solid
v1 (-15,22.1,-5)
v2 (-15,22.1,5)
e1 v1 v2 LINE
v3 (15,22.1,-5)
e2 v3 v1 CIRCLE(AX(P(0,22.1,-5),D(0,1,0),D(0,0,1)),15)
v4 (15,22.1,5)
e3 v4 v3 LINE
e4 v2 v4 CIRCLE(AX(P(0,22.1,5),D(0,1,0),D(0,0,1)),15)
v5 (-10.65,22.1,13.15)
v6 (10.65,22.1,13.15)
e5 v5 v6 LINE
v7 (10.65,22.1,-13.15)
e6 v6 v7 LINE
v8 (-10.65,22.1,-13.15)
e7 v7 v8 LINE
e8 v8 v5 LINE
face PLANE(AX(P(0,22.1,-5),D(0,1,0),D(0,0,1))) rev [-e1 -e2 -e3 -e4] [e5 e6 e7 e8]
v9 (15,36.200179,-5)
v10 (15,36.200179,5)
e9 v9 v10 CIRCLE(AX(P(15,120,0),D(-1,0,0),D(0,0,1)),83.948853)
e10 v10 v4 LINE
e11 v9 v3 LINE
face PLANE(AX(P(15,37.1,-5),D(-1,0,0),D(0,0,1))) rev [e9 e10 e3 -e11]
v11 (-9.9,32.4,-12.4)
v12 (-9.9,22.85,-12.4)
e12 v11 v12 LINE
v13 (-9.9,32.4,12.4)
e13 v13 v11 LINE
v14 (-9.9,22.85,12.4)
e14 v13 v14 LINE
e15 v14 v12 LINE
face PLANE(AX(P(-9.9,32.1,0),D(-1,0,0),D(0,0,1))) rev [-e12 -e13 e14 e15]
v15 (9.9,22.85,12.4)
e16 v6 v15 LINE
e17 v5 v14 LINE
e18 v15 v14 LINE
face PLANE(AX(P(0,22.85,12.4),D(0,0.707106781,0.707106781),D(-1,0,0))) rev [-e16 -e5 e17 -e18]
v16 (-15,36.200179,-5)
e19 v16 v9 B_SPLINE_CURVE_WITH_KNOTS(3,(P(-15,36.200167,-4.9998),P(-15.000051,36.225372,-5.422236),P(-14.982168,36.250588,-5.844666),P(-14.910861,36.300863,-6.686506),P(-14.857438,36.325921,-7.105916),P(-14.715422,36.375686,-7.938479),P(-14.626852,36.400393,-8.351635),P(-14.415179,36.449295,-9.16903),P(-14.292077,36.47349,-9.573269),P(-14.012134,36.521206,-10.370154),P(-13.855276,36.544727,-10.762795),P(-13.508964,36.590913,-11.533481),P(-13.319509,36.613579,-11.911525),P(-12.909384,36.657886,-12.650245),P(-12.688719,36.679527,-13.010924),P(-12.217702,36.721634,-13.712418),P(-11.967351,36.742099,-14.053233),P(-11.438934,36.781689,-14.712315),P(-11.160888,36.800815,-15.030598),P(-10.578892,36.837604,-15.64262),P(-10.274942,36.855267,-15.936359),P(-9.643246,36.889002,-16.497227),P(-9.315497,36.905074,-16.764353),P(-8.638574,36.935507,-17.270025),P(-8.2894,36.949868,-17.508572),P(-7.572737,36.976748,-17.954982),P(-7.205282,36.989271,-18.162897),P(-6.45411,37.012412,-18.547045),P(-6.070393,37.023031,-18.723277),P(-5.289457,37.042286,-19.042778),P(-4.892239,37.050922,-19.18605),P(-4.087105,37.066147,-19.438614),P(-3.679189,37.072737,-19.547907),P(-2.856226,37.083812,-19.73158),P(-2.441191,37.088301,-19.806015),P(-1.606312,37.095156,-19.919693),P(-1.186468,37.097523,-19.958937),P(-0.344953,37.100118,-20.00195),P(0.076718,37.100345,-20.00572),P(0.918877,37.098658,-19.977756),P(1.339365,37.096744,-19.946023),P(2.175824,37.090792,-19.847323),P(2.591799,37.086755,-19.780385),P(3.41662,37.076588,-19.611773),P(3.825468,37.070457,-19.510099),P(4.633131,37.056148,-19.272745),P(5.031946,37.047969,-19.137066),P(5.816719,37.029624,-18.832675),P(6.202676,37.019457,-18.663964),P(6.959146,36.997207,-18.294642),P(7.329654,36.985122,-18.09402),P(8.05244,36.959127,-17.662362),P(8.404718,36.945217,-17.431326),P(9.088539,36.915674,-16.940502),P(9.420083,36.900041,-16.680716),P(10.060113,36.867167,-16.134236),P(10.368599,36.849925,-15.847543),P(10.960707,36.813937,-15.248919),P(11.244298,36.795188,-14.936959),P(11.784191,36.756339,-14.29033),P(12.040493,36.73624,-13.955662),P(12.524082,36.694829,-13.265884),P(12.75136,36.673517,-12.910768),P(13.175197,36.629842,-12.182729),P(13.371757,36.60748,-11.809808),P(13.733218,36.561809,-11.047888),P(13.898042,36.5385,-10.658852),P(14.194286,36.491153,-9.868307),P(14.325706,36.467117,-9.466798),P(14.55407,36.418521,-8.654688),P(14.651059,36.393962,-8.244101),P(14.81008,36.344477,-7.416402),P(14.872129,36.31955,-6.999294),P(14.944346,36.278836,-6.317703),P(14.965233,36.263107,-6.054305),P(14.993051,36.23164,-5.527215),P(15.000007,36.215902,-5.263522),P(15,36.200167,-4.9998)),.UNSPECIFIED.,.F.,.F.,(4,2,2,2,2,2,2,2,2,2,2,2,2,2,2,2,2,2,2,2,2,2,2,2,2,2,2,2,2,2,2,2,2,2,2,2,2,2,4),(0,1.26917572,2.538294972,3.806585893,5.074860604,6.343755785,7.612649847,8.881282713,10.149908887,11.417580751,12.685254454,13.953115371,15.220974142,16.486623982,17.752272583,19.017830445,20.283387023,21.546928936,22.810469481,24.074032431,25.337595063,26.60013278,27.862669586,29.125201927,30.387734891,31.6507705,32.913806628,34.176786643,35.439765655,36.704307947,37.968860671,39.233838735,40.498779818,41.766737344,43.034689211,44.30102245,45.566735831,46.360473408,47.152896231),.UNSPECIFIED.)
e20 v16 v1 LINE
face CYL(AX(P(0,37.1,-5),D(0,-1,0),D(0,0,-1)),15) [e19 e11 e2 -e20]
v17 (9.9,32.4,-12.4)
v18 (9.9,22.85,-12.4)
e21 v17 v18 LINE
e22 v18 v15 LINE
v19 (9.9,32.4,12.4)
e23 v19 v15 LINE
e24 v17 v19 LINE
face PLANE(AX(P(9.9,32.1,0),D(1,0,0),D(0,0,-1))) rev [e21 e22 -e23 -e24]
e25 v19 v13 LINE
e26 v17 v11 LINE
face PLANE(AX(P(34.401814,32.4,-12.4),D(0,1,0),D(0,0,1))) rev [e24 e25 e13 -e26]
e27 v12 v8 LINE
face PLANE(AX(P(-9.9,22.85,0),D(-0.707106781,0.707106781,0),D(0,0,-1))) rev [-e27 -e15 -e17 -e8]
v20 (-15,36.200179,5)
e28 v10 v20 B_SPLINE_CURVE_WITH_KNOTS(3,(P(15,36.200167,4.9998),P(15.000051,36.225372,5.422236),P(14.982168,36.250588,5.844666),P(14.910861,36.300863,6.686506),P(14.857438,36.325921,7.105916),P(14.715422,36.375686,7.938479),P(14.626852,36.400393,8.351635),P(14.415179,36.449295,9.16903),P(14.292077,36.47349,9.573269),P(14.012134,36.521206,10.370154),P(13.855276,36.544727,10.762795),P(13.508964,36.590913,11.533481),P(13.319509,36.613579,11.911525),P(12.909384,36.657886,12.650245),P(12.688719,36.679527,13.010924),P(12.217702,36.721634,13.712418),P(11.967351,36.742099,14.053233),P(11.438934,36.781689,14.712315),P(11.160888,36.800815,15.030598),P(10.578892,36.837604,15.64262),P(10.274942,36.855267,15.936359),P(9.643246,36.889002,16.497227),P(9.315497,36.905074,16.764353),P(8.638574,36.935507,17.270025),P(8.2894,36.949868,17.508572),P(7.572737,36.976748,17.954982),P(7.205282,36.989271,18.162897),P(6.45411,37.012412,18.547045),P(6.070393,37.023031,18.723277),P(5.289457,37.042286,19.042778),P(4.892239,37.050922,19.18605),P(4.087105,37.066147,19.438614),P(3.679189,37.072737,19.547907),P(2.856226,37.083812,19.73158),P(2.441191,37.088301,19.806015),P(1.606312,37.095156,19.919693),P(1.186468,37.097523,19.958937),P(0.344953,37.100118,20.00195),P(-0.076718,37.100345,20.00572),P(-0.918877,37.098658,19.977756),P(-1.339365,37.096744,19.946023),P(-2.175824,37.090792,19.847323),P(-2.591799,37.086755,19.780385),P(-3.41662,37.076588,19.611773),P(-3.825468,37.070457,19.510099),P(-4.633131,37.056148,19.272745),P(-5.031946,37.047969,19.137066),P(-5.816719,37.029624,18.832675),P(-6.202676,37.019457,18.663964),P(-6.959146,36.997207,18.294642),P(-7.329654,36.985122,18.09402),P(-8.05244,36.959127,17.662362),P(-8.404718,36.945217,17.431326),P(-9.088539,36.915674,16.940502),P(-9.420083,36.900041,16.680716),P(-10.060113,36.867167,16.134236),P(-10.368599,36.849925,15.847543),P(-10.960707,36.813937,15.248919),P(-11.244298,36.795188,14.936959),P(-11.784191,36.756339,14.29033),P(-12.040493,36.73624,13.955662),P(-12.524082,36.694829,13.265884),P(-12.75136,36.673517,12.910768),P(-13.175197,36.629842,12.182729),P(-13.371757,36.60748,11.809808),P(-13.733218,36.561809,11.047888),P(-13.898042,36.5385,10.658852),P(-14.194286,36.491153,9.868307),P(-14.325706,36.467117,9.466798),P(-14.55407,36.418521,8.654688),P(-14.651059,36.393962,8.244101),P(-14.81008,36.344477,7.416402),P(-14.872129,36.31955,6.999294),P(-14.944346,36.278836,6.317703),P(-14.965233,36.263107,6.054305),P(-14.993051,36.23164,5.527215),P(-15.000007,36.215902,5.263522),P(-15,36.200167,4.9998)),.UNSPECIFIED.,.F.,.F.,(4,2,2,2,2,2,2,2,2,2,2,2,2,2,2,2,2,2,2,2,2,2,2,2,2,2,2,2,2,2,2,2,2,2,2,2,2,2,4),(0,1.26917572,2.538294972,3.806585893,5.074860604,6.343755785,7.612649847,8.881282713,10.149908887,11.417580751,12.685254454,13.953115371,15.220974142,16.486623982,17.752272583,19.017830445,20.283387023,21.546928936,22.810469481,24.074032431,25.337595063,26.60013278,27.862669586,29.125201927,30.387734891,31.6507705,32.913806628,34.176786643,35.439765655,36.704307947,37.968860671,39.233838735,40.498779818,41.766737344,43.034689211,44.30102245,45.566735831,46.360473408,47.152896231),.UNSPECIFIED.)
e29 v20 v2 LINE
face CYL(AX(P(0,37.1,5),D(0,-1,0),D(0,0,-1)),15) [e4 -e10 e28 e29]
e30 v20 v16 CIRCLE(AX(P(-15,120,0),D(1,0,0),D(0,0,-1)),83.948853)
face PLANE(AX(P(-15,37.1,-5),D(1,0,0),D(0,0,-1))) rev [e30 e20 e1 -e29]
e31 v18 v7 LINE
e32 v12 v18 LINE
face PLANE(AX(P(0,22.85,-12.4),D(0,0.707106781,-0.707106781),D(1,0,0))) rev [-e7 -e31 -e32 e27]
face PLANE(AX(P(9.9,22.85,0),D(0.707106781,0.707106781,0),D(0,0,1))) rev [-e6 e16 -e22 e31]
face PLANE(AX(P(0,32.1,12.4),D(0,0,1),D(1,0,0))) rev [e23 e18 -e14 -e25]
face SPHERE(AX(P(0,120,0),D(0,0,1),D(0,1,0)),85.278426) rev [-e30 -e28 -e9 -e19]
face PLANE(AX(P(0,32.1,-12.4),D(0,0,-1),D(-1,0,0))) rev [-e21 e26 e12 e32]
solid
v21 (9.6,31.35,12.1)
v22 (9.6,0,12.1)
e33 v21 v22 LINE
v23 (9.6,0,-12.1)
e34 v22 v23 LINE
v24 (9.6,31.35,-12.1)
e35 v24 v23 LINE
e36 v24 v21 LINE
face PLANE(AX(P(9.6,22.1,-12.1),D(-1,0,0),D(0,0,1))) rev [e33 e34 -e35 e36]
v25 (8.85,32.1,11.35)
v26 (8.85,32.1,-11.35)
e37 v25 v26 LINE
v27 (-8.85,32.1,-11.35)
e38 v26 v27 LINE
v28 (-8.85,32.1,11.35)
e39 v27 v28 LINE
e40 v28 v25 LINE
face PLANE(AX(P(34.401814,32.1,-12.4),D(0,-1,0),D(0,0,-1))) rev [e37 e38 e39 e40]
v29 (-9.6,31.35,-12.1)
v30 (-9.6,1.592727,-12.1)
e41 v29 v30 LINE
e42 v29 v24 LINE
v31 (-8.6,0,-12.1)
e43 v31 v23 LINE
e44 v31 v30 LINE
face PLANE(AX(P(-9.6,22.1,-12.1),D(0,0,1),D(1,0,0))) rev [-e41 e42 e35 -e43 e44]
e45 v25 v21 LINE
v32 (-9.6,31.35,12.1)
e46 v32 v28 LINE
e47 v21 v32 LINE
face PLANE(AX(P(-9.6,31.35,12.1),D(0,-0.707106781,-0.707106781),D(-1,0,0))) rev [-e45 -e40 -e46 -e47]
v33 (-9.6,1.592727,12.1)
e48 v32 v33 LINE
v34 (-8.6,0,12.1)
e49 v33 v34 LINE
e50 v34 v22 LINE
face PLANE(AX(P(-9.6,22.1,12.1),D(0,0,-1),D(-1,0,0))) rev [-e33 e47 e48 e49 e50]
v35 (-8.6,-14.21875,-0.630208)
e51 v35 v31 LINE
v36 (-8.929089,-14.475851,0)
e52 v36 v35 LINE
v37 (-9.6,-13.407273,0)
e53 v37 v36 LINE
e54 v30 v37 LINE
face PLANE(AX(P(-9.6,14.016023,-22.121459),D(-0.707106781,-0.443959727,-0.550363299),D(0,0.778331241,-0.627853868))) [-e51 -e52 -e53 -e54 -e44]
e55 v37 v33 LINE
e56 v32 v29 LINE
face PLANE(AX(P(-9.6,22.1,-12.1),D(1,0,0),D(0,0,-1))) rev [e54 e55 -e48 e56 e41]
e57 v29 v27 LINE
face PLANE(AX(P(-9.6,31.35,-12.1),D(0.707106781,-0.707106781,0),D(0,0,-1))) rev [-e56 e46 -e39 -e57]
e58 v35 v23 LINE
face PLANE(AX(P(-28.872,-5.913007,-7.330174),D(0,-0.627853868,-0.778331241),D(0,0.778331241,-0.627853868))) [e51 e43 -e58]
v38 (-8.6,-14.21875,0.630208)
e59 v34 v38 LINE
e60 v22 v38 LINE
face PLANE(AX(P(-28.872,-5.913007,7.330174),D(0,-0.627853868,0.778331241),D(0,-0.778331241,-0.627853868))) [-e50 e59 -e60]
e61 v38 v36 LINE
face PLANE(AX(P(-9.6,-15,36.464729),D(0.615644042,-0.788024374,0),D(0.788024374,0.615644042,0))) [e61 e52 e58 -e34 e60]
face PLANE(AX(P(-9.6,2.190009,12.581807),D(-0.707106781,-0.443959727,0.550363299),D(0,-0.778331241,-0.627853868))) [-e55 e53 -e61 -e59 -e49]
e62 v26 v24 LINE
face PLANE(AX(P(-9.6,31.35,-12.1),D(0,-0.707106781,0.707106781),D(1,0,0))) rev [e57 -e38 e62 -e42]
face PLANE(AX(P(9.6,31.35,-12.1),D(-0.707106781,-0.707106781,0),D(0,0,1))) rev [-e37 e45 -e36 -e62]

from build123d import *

# Parameters (mm, degrees)
SKETCH1_W               = 19.2
SKETCH1_H               = 24.2
BOSS_EXTRUDE1_DEPTH     = 22.1
BOSS_EXTRUDE2_DEPTH     = 15
BOSS_EXTRUDE3_DEPTH     = 5
BOSS_EXTRUDE4_DEPTH     = 1.5
FILLET1_R               = 3
SKETCH9_W               = 19.8
SKETCH9_H               = 24.8
SKETCH9_W_2             = 19.2
SKETCH9_H_2             = 24.2
CUT_EXTRUDE_THIN1_DEPTH = 10
SKETCH10_W              = 24.8
SKETCH10_H              = 0.3
CUT_EXTRUDE1_DEPTH      = 19.2
SKETCH12_W              = 19.8
SKETCH12_H              = 24.8
CUT_EXTRUDE3_DEPTH      = 0.3
SKETCH13_W              = 24.2
SKETCH13_H              = 15
CUT_EXTRUDE4_DEPTH      = 49.801332116
CHAMFER1_SIZE           = 0.75
CHAMFER2_SIZE           = 0.75
BOSS_EXTRUDE5_DEPTH     = 24.2
CUT_EXTRUDE5_DEPTH      = 19.2
CHAMFER3_SIZE           = 1


with BuildPart() as part:
    # Sketch1 → Boss-Extrude1 (new body)
    with BuildSketch(Plane(origin=(0, 0, 0), x_dir=(1, 0, 0), z_dir=(0, 1, 0))):
        Rectangle(SKETCH1_W, SKETCH1_H)
    extrude(amount=BOSS_EXTRUDE1_DEPTH)

    # Sketch2 → Boss-Extrude2 (add)
    with BuildSketch(Plane(origin=(0, 22.1, 0), x_dir=(1, 0, 0), z_dir=(0, 1, 0))):
        with BuildLine():
            Line((15, 5), (15, -5))
            ThreePointArc((15, -5), (0, -20), (-15, -5))
            Line((-15, -5), (-15, 5))
            ThreePointArc((-15, 5), (0, 20), (15, 5))
        make_face()
    extrude(amount=BOSS_EXTRUDE2_DEPTH)

    # Sketch4 → Boss-Extrude3 (add)
    with BuildSketch(Plane.ZY.offset(9.6)):
        Polygon((-12.1, 0), (0, -15), (12.1, 0), align=None)
    extrude(amount=-BOSS_EXTRUDE3_DEPTH)

    # Sketch6 → Boss-Extrude4 (add, symmetric)
    with BuildSketch(Plane.XY):
        Polygon((-4.6, -5), (9.6, 0), (-4.6, 0), align=None)
    extrude(amount=BOSS_EXTRUDE4_DEPTH, both=True)

    # Fillet1
    fillet1_edges = [part.edges().sort_by_distance(p)[0] for p in [
        (-4.6, 0, 6.8),
        (-4.6, 0, -6.8),
    ]]
    fillet(fillet1_edges, radius=FILLET1_R)

    # Sketch8 → Cut-Revolve3 (revolve, cut)
    with BuildSketch(Plane(origin=(0, 0, 0), x_dir=(0, 0, -1), z_dir=(1, 0, 0))):
        with BuildLine():
            Line((-85.278426346, 120), (85.278426346, 120))
            ThreePointArc((85.278426346, 120), (0, 34.721573654), (-85.278426346, 120))
        make_face()
    revolve(axis=Axis((0, 120, 85.278426346), (0, 0, -1)), mode=Mode.SUBTRACT)

    # Sketch9 → Cut-Extrude-Thin1 (cut)
    with BuildSketch(Plane.XZ.offset(-22.1)):
        Rectangle(SKETCH9_W, SKETCH9_H)
        Rectangle(SKETCH9_W_2, SKETCH9_H_2, mode=Mode.SUBTRACT)
    extrude(amount=-CUT_EXTRUDE_THIN1_DEPTH, mode=Mode.SUBTRACT)

    # Sketch10 → Cut-Extrude1 (cut)
    with BuildSketch(Plane.ZY.offset(9.6)):
        with Locations((0, 32.25)):
            Rectangle(SKETCH10_W, SKETCH10_H)
    extrude(amount=-CUT_EXTRUDE1_DEPTH, mode=Mode.SUBTRACT)


with BuildPart() as cut_extrude1_piece_1:
    # of the separate pieces the step leaves, piece 1, a body of its own (cut_extrude1_pieces)
    add(part.part.solids().sort_by_distance((-1.6, 0, -12.1))[0])

    # Sketch13 → Cut-Extrude4 (cut, through all)
    with BuildSketch(Plane(origin=(9.6, 0, 0), x_dir=(0, 0, -1), z_dir=(1, 0, 0))):
        with Locations((0, -7.5)):
            Rectangle(SKETCH13_W, SKETCH13_H)
    extrude(amount=-CUT_EXTRUDE4_DEPTH, mode=Mode.SUBTRACT)

    # Chamfer2
    chamfer2_edges = [cut_extrude1_piece_1.edges().sort_by_distance(p)[0] for p in [
        (0, 32.1, -12.1),
        (9.6, 32.1, 0),
        (0, 32.1, 12.1),
        (-9.6, 32.1, 0),
    ]]
    chamfer(chamfer2_edges, length=CHAMFER2_SIZE)

    # Sketch19 → Boss-Extrude5 (add)
    with BuildSketch(Plane(origin=(0, 0, -12.1), x_dir=(-1, 0, 0), z_dir=(0, 0, -1))):
        Polygon((-9.6, 0), (9.6, 0), (9.6, -15), align=None)
    extrude(amount=-BOSS_EXTRUDE5_DEPTH)

    # Sketch20 → Cut-Extrude5 (cut)
    with BuildSketch(Plane(origin=(9.6, 0, 0), x_dir=(0, 0, -1), z_dir=(1, 0, 0))):
        Polygon((0, -15), (-12.1, 0), (-12.1, -15), align=None)
        Polygon((12.1, 0), (0, -15), (12.1, -15), align=None)
    extrude(amount=-CUT_EXTRUDE5_DEPTH, mode=Mode.SUBTRACT)

    # Chamfer3
    # the kernel refuses this chamfer: 1 mm, written as the material it takes off along each edge
    with BuildSketch(Plane(origin=(-9.6, -17.001621212, -1.614641111), x_dir=(-0.02749587661058568, 0.6276164868252807, -0.778036967138778), z_dir=(0, 0.7783312410184164, 0.6278538677548557)), Plane(origin=(-9.6, 2.001621212, -13.714641111), x_dir=(-0.0274958766105857, 0.6276164868252808, 0.7780369671387779), z_dir=(0, -0.7783312410184163, 0.6278538677548559))) as chamfer3_piece_1:
        Polygon((CHAMFER3_SIZE * 0.999621916911, -CHAMFER3_SIZE * 0.0274958766106), (-CHAMFER3_SIZE * 0.0274958766106, -CHAMFER3_SIZE * 0.999621916911), (0, 0), align=None)
    extrude(amount=24.415366391, mode=Mode.SUBTRACT)


with BuildPart() as cut_extrude1_piece_2:
    # of the separate pieces the step leaves, piece 2, a body of its own (cut_extrude1_pieces)
    add(part.part.solids().sort_by_distance((-9.6, 32.1, -12.4))[0])

    # Sketch12 → Cut-Extrude3 (cut)
    with BuildSketch(Plane.XZ.offset(-32.1)):
        Rectangle(SKETCH12_W, SKETCH12_H)
    extrude(amount=-CUT_EXTRUDE3_DEPTH, mode=Mode.SUBTRACT)

    # Chamfer1
    chamfer1_edges = [cut_extrude1_piece_2.edges().sort_by_distance(p)[0] for p in [
        (9.9, 22.1, 0),
        (0, 22.1, -12.4),
        (-9.9, 22.1, 0),
        (0, 22.1, 12.4),
    ]]
    chamfer(chamfer1_edges, length=CHAMFER1_SIZE)


solid = Compound([cut_extrude1_piece_1.part, cut_extrude1_piece_2.part])
